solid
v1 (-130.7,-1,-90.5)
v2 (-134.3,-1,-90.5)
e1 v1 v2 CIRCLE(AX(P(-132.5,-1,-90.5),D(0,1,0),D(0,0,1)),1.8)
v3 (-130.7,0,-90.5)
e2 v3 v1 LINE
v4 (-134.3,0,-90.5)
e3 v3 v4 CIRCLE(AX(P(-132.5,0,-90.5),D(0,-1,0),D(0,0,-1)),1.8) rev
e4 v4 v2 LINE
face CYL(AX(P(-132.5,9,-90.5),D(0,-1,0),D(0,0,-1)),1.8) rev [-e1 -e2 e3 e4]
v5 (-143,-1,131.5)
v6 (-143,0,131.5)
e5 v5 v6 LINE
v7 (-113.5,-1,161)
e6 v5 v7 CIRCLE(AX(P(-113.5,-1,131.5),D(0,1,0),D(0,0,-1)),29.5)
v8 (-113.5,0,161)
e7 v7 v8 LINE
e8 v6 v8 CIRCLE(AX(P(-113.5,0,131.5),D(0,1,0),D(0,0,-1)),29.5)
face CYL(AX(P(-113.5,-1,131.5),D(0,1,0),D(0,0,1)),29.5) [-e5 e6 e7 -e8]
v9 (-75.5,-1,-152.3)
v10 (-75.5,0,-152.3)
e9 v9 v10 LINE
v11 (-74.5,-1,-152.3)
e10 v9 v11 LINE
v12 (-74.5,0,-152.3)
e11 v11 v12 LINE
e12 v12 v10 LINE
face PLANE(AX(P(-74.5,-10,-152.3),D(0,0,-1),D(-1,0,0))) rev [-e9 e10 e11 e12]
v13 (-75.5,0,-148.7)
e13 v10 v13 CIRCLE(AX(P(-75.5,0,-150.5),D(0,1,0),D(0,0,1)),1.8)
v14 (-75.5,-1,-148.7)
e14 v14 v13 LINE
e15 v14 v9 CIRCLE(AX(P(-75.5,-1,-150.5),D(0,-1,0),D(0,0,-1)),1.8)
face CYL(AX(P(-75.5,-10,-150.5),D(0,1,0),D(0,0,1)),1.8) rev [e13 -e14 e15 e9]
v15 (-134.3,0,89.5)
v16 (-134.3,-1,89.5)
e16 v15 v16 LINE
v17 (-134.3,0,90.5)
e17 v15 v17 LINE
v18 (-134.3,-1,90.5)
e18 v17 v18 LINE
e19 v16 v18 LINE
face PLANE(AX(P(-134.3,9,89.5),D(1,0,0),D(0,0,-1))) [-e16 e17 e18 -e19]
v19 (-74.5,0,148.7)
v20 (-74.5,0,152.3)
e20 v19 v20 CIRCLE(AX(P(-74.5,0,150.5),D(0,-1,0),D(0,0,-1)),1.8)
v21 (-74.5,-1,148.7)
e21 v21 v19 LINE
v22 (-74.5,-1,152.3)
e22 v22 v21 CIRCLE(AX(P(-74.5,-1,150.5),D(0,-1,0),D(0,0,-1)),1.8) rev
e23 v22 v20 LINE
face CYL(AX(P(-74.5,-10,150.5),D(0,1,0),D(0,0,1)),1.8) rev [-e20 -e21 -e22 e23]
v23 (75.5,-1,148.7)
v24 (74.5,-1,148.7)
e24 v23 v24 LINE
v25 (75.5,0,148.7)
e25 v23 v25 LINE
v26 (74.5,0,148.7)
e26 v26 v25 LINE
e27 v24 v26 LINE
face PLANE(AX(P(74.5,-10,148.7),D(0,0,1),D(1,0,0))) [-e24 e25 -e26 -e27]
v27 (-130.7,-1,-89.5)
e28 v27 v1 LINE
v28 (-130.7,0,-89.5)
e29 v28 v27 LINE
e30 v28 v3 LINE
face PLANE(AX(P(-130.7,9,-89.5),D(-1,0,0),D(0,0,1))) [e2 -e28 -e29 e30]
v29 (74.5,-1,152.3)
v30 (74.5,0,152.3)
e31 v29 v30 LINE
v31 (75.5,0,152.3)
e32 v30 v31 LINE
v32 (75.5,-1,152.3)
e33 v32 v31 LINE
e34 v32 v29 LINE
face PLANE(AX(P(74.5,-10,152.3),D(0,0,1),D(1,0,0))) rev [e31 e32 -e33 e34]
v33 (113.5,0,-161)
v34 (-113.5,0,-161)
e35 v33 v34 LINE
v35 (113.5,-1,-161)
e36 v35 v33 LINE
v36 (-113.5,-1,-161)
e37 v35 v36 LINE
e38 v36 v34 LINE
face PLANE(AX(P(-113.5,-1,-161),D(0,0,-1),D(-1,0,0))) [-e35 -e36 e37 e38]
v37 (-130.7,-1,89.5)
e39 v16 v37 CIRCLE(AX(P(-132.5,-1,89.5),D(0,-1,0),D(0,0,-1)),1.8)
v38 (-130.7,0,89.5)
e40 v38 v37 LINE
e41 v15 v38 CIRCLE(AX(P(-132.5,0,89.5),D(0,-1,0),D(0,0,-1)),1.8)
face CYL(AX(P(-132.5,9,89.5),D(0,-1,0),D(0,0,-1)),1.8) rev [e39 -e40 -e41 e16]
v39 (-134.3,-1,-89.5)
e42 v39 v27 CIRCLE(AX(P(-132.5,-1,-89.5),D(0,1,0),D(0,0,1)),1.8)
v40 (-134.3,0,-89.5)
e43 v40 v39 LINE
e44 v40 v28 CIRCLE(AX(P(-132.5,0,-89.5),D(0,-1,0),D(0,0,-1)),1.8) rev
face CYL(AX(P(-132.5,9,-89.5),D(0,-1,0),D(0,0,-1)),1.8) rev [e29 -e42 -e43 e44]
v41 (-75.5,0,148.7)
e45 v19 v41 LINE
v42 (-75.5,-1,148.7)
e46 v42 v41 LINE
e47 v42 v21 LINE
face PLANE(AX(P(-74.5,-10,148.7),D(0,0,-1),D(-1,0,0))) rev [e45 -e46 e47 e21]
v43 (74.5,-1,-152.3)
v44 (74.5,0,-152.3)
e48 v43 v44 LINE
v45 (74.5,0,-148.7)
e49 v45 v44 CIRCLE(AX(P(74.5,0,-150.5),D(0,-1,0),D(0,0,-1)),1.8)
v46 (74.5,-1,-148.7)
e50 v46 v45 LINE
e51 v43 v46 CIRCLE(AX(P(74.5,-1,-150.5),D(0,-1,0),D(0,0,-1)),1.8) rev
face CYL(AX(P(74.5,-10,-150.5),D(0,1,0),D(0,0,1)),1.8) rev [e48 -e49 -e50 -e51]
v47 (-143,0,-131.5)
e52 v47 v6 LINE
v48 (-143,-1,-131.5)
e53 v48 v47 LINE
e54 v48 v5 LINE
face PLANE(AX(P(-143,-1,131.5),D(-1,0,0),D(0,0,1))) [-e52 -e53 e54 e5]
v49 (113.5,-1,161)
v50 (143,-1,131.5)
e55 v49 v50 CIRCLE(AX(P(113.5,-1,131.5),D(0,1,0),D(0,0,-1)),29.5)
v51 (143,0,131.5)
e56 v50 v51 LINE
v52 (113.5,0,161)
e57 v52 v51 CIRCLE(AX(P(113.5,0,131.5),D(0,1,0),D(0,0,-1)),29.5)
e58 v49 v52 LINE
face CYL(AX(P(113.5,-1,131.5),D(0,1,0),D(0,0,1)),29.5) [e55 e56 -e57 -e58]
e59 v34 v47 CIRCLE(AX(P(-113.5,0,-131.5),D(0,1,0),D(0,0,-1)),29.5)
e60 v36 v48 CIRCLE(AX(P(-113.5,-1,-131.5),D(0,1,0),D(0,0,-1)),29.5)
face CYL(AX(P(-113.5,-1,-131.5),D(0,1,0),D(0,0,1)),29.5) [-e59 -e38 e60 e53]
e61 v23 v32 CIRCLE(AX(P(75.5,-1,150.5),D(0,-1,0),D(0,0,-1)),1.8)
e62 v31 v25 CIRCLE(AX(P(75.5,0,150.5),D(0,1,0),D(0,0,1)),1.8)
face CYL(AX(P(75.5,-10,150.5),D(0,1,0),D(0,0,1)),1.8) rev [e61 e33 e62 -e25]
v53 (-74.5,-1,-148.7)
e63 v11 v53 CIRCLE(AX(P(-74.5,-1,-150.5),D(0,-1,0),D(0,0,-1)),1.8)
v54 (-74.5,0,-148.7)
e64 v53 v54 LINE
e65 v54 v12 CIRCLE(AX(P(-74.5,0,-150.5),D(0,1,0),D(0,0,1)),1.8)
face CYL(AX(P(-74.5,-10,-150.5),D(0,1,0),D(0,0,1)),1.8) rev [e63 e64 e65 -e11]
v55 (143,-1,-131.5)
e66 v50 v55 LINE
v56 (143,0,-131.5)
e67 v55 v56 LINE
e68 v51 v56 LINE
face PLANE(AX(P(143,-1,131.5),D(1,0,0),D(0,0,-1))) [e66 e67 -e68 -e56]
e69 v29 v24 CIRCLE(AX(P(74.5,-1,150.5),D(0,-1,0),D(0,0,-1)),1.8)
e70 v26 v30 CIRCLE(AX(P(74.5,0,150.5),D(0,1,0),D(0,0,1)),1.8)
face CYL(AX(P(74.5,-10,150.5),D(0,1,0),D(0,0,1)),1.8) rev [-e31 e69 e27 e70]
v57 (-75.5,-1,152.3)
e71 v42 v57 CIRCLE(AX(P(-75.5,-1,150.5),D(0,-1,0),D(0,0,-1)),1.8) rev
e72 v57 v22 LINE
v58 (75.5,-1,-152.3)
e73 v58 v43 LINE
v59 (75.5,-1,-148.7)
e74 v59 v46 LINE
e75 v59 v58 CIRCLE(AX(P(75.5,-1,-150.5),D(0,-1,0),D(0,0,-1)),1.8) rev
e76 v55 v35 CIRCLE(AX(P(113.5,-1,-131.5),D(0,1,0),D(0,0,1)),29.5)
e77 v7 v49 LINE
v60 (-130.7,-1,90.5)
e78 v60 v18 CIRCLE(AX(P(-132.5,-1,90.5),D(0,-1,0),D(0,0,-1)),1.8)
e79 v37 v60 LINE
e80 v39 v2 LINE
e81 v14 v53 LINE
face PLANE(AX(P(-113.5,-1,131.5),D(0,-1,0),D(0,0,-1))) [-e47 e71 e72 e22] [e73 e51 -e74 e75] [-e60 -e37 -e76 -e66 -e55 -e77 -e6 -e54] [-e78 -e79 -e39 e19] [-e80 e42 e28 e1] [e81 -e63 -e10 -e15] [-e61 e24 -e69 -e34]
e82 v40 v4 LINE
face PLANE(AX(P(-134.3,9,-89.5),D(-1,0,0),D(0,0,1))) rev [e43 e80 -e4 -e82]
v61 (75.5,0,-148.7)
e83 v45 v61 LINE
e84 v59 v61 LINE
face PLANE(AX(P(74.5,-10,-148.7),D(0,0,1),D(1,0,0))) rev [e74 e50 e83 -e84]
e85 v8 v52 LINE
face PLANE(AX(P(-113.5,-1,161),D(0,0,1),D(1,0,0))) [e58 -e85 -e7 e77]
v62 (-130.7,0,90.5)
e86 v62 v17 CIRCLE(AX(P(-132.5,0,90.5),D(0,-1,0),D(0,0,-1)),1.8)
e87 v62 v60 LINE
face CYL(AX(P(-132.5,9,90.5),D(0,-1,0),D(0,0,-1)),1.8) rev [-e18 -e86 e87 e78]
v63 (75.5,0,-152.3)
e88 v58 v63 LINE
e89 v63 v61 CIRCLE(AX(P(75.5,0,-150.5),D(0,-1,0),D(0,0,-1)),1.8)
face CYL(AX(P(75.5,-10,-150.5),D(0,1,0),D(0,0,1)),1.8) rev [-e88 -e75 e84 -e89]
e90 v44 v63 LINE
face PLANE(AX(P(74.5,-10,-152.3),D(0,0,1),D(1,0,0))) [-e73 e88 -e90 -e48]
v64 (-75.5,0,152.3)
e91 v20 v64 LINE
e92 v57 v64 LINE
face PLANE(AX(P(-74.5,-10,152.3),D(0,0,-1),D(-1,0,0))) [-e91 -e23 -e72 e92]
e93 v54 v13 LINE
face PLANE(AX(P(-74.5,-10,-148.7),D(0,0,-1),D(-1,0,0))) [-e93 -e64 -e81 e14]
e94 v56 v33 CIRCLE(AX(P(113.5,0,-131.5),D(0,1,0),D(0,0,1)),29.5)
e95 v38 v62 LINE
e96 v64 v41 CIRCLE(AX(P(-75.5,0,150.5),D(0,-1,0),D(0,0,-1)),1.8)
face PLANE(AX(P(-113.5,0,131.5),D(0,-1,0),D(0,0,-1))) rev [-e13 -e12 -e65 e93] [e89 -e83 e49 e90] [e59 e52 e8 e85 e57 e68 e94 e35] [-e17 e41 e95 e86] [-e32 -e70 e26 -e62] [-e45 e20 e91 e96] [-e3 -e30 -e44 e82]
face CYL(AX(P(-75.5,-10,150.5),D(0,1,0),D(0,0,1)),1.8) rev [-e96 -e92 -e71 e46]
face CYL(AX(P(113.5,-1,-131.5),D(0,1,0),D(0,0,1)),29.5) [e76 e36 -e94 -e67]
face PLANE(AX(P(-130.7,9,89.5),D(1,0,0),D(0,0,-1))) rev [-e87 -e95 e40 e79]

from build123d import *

# Parameters (mm, degrees)
SM_BASE_FLANGE_1_DEPTH = 1
CUT_EXTRUDE_1_DEPTH    = 10
CUT_EXTRUDE_2_DEPTH    = 10


# Sheet-metal steps are written as plain solids
with BuildPart() as part:
    # Sketch 1 → Базовая кромка1 (new body)
    with BuildSketch(Plane(origin=(0, 0, 0), x_dir=(1, 0, 0), z_dir=(0, 1, 0))):
        with BuildLine():
            Line((-113.5, -161), (113.5, -161))
            ThreePointArc((113.5, -161), (134.359650045, -152.359650045), (143, -131.5))
            Line((143, -131.5), (143, 131.5))
            ThreePointArc((143, 131.5), (134.359650045, 152.359650045), (113.5, 161))
            Line((113.5, 161), (-113.5, 161))
            ThreePointArc((-113.5, 161), (-134.359650045, 152.359650045), (-143, 131.5))
            Line((-143, 131.5), (-143, -131.5))
            ThreePointArc((-143, -131.5), (-134.359650045, -152.359650045), (-113.5, -161))
        make_face()
    extrude(amount=-SM_BASE_FLANGE_1_DEPTH)

    # Sketch 2 → Вырез-Вытянуть1 (cut)
    with BuildSketch(Plane(origin=(0, 0, 0), x_dir=(1, 0, 0), z_dir=(0, 1, 0))):
        with BuildLine():
            Line((74.5, -148.7), (75.5, -148.7))
            ThreePointArc((75.5, -148.7), (77.3, -150.5), (75.5, -152.3))
            Line((75.5, -152.3), (74.5, -152.3))
            ThreePointArc((74.5, -152.3), (72.7, -150.5), (74.5, -148.7))
        make_face()
        with BuildLine():
            Line((-74.5, -148.7), (-75.5, -148.7))
            ThreePointArc((-75.5, -148.7), (-77.3, -150.5), (-75.5, -152.3))
            Line((-75.5, -152.3), (-74.5, -152.3))
            ThreePointArc((-74.5, -152.3), (-72.7, -150.5), (-74.5, -148.7))
        make_face()
        with BuildLine():
            Line((74.5, 148.7), (75.5, 148.7))
            ThreePointArc((75.5, 148.7), (77.3, 150.5), (75.5, 152.3))
            Line((75.5, 152.3), (74.5, 152.3))
            ThreePointArc((74.5, 152.3), (72.7, 150.5), (74.5, 148.7))
        make_face()
        with BuildLine():
            Line((-74.5, 148.7), (-75.5, 148.7))
            ThreePointArc((-75.5, 148.7), (-77.3, 150.5), (-75.5, 152.3))
            Line((-75.5, 152.3), (-74.5, 152.3))
            ThreePointArc((-74.5, 152.3), (-72.7, 150.5), (-74.5, 148.7))
        make_face()
    extrude(amount=-CUT_EXTRUDE_1_DEPTH, mode=Mode.SUBTRACT)

    # Эскиз3 → Вырез-Вытянуть2 (cut)
    with BuildSketch(Plane.XZ.offset(1)):
        with BuildLine():
            Line((-134.3, 89.5), (-134.3, 90.5))
            ThreePointArc((-134.3, 90.5), (-132.5, 92.3), (-130.7, 90.5))
            Line((-130.7, 90.5), (-130.7, 89.5))
            ThreePointArc((-130.7, 89.5), (-132.5, 87.7), (-134.3, 89.5))
        make_face()
        with BuildLine():
            Line((-134.3, -89.5), (-134.3, -90.5))
            ThreePointArc((-134.3, -90.5), (-132.5, -92.3), (-130.7, -90.5))
            Line((-130.7, -90.5), (-130.7, -89.5))
            ThreePointArc((-130.7, -89.5), (-132.5, -87.7), (-134.3, -89.5))
        make_face()
    extrude(amount=-CUT_EXTRUDE_2_DEPTH, mode=Mode.SUBTRACT)


solid = part.part
